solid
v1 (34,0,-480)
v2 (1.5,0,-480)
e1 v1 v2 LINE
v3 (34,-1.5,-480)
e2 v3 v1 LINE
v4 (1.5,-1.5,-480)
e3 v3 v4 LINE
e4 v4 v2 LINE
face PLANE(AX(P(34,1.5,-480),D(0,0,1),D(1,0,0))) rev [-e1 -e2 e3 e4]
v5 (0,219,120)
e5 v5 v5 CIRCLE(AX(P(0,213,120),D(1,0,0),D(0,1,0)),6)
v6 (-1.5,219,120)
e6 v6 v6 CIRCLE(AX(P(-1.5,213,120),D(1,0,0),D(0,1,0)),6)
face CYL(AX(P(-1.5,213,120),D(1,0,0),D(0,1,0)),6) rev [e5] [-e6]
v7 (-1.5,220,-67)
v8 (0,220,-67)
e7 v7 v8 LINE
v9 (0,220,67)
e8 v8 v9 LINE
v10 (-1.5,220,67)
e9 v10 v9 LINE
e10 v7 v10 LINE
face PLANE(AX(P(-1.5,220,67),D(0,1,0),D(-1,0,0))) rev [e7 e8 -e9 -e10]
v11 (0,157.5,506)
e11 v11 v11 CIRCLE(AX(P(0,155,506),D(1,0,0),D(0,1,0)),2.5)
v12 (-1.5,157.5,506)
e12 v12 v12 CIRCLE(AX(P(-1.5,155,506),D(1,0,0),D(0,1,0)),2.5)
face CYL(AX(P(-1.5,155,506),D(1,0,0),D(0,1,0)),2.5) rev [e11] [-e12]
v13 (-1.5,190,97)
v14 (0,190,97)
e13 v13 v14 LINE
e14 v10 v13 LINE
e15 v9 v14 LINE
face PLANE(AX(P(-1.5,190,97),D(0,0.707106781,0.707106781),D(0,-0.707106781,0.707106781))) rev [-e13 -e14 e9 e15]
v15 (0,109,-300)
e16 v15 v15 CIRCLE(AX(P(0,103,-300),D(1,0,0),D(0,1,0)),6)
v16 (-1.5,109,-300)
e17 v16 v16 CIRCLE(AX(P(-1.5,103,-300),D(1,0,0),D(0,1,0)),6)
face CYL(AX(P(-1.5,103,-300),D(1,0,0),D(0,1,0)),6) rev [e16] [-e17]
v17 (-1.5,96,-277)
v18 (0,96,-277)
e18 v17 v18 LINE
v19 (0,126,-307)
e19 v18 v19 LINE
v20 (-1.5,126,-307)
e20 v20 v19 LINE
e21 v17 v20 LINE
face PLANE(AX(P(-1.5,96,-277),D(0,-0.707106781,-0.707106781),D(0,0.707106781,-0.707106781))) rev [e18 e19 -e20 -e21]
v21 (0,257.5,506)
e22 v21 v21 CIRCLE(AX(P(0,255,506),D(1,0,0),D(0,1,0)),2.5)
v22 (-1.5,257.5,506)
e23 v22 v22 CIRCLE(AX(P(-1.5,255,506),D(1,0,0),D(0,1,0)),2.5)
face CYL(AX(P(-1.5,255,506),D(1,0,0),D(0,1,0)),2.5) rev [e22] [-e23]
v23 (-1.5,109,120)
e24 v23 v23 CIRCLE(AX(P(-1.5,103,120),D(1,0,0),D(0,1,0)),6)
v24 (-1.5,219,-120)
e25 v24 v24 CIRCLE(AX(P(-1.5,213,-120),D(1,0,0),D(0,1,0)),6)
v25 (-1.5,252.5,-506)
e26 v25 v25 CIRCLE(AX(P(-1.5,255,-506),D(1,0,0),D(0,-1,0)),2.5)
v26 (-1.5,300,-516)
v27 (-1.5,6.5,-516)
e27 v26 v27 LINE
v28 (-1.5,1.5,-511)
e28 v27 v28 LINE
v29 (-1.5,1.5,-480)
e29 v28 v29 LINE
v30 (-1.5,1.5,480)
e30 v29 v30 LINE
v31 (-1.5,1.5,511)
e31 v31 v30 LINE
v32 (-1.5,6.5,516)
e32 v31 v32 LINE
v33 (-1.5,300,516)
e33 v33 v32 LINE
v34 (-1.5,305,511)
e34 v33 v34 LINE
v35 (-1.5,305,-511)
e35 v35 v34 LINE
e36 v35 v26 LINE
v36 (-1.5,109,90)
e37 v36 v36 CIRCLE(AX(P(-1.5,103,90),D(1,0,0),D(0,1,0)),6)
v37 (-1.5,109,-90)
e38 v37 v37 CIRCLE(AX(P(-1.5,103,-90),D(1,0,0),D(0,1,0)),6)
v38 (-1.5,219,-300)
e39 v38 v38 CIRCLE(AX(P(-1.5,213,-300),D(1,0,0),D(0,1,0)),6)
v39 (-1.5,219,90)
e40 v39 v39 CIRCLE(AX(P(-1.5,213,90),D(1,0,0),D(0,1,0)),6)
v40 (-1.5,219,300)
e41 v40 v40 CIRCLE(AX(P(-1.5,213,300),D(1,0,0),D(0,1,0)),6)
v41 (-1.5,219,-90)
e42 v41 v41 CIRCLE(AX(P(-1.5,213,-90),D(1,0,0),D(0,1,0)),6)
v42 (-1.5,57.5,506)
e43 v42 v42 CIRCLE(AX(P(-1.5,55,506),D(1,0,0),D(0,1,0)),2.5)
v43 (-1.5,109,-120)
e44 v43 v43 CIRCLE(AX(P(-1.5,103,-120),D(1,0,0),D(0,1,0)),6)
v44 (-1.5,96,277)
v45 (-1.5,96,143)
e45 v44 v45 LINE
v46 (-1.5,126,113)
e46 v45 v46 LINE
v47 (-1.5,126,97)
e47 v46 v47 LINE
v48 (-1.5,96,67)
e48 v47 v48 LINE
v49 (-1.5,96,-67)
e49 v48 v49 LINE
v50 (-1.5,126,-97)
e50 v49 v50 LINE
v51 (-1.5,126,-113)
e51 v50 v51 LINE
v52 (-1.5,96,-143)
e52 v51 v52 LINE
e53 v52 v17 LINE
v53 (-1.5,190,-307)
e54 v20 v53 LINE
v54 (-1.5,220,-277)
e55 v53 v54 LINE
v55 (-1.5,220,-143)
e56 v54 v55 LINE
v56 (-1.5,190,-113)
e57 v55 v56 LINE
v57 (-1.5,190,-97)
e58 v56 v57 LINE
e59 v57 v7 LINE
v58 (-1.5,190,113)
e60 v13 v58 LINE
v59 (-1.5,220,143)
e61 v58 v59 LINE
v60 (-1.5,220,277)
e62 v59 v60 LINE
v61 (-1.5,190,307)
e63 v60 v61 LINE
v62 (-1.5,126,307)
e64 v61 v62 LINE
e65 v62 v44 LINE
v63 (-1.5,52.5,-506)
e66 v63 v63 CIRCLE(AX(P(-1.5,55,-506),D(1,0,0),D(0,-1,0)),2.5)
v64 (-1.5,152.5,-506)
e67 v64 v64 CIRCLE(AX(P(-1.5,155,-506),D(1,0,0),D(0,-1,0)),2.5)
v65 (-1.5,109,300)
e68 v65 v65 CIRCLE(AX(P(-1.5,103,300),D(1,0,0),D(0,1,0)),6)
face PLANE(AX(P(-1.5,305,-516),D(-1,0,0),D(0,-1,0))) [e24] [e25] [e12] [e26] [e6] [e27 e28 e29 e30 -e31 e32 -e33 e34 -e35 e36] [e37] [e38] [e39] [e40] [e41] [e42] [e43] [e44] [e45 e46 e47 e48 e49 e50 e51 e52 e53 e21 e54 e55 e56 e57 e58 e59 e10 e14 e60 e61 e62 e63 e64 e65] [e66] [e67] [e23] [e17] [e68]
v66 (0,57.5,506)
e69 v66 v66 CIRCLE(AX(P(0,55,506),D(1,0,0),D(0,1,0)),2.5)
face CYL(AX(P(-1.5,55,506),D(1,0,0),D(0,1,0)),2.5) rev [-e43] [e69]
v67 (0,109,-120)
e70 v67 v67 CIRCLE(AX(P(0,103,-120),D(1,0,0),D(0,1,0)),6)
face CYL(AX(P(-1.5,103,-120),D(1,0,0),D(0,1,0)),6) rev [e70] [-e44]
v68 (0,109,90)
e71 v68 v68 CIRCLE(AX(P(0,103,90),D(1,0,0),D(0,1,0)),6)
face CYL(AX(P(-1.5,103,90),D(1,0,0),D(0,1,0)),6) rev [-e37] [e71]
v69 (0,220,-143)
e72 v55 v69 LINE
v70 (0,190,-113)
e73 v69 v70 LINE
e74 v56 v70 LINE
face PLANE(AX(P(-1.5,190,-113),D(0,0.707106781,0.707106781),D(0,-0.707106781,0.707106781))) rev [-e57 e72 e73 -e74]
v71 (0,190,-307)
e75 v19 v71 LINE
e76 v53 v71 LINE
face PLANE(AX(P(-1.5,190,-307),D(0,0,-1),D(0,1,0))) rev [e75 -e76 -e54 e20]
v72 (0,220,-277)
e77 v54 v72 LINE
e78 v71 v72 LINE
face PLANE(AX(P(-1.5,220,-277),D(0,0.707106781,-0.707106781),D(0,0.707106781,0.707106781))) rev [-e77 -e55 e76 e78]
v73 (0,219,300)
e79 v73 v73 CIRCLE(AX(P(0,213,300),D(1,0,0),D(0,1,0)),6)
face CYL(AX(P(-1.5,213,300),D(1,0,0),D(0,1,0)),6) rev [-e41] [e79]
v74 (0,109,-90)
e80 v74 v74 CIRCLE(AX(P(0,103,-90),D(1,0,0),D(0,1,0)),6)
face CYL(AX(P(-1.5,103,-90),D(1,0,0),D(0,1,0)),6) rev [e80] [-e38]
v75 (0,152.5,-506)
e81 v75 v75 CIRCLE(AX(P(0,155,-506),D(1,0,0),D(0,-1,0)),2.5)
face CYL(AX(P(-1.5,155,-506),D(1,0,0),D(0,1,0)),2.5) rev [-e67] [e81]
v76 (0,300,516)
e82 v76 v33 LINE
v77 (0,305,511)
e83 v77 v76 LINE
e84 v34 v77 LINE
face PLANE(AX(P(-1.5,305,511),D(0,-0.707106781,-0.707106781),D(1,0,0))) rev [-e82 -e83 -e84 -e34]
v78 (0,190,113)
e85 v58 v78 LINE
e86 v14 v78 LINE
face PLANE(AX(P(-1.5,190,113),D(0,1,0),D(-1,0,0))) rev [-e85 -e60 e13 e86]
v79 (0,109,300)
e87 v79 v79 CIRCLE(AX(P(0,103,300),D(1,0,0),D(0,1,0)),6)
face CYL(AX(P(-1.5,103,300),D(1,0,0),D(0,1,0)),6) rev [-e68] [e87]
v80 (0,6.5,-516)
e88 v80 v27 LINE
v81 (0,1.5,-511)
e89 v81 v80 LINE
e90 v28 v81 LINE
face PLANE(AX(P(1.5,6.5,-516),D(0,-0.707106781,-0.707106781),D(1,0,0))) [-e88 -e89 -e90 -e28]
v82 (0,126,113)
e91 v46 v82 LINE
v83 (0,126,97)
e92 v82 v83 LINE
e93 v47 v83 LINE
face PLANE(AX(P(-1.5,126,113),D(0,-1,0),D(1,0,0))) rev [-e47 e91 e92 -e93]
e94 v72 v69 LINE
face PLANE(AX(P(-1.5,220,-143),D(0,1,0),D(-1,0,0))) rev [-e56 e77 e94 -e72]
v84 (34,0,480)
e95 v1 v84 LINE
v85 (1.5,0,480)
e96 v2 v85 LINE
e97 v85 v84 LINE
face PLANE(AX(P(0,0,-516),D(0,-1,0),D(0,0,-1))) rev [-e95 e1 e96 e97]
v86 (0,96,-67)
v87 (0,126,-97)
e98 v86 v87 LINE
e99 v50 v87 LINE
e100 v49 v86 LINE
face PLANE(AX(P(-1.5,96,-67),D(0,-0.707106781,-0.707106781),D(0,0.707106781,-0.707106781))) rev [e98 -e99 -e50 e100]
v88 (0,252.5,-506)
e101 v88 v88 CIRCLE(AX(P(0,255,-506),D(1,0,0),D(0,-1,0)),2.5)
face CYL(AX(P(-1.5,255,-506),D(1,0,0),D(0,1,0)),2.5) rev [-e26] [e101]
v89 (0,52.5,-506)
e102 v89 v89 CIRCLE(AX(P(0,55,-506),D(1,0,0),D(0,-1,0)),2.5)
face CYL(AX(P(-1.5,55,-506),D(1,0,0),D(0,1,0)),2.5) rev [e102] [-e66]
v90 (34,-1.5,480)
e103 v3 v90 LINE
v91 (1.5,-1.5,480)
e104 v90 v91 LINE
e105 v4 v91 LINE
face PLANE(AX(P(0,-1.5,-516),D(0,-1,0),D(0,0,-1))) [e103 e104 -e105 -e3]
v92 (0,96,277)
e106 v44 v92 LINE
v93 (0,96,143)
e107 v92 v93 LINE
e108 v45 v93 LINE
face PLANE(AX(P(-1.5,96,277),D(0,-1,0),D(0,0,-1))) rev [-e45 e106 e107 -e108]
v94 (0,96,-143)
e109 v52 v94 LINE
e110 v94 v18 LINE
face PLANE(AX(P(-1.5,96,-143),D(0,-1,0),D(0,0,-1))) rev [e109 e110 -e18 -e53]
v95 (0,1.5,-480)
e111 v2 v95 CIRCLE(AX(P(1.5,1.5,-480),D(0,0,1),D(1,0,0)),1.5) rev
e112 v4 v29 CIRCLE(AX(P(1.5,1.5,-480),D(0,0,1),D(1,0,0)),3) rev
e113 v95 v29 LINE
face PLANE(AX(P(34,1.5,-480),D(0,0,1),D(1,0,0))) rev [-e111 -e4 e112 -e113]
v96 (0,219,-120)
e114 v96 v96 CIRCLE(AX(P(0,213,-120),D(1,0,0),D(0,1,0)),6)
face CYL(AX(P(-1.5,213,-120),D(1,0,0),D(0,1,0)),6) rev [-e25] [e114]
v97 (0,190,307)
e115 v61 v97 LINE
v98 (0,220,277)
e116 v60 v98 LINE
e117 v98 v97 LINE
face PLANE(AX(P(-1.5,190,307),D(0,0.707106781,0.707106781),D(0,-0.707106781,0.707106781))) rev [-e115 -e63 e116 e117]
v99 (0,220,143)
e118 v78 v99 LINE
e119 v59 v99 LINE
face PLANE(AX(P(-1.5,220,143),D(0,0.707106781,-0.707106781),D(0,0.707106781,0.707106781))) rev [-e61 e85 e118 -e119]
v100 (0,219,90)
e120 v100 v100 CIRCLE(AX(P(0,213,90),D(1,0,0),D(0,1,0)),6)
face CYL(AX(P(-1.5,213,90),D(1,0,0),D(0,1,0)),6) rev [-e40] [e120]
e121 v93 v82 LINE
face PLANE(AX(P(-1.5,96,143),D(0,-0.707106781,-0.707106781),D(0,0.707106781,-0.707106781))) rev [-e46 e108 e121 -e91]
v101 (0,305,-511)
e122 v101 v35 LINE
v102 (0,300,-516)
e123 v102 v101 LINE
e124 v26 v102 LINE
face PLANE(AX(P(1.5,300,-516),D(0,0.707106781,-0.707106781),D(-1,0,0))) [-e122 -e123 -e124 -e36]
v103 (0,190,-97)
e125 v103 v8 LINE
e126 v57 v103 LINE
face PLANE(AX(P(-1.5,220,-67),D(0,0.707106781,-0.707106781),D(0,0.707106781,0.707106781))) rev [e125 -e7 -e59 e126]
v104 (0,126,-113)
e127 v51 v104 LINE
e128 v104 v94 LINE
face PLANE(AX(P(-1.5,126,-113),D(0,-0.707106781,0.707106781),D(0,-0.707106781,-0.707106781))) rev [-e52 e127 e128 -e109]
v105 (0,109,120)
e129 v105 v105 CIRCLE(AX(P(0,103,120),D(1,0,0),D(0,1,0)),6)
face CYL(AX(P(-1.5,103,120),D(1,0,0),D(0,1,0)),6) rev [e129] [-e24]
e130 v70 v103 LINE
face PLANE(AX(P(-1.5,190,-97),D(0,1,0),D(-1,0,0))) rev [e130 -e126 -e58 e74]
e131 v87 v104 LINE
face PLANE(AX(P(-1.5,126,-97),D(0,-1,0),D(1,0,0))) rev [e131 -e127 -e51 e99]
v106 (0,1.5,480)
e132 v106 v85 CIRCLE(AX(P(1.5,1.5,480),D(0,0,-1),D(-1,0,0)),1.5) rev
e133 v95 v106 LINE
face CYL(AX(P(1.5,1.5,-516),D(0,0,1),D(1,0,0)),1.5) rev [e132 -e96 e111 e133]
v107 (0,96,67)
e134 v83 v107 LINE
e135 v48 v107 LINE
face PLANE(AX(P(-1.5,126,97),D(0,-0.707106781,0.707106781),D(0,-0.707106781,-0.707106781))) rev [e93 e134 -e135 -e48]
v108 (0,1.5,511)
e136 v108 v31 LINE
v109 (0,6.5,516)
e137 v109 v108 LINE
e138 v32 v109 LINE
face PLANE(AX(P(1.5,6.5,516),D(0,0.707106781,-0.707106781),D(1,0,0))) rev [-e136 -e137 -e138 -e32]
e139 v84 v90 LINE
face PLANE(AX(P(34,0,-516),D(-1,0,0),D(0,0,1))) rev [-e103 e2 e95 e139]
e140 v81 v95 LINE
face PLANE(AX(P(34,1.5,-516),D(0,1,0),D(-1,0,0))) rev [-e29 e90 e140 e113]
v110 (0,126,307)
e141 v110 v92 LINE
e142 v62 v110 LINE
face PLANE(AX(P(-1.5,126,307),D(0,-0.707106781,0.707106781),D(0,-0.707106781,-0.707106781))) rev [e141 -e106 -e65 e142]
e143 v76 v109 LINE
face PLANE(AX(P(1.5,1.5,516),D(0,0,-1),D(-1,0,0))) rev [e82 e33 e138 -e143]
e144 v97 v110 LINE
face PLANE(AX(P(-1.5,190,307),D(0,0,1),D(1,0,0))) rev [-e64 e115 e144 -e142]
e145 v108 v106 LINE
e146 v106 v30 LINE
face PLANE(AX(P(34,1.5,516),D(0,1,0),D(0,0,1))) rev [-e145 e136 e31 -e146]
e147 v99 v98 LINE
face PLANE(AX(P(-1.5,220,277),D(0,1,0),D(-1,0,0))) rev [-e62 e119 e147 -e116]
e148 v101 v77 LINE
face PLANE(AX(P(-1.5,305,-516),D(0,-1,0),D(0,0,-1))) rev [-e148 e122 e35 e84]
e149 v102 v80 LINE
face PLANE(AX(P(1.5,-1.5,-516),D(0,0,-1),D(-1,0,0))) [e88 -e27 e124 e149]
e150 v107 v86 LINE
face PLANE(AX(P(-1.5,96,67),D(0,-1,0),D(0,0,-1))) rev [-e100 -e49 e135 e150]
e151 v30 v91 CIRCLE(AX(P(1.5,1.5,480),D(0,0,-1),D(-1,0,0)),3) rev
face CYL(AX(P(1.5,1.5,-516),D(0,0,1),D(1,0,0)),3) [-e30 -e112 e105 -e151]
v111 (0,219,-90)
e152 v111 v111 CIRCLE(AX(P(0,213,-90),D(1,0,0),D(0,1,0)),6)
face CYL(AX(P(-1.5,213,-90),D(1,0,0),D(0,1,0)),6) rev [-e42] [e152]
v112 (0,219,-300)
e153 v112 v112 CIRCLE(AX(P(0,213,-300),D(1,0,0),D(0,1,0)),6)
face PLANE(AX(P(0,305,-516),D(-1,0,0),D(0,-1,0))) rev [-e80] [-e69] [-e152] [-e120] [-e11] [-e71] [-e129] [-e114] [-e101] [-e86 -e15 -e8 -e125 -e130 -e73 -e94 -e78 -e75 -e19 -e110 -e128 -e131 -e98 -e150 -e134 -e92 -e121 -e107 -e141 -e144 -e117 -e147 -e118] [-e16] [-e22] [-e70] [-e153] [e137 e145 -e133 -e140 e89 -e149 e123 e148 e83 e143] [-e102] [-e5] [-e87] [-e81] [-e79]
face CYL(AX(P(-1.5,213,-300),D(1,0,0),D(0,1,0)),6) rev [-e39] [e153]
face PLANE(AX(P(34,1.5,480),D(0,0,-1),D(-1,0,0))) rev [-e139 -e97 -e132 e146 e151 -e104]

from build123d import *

# Parameters (mm, degrees)
SM_BASE_FLANGE_1_DEPTH = 516
SKETCH_7_W             = 36
SKETCH_7_H             = 3
CUT_EXTRUDE_1_DEPTH    = 601.450872262
OTHER_START            = -1.5
OTHER_1_DEPTH          = 1.5
SKETCH_8_R             = 6
CUT_EXTRUDE_1446_DEPTH = 10
PATTERN_LINEAR_1_COUNT = 3
PATTERN_LINEAR_1_PITCH = 210
SKETCH_9_R             = 2.5
CUT_EXTRUDE_3_DEPTH    = 10
SKETCH_10_W            = 16
SKETCH_10_H            = 64
CUT_EXTRUDE_4_DEPTH    = 10


# Read off the part's stored shape, not the designer's step: Затупленный угол1
# Sheet-metal steps are written as plain solids
with BuildPart() as part:
    # Sketch 1 → Базовая кромка1 (new, symmetric)
    with BuildSketch(Plane.XY):
        with BuildLine():
            Line((0, 305), (0, 1.5))
            ThreePointArc((0, 1.5), (0.439339828, 0.439339828), (1.5, 0))
            Line((1.5, 0), (34, 0))
            Line((34, 0), (34, -1.5))
            Line((34, -1.5), (1.5, -1.5))
            ThreePointArc((1.5, -1.5), (-0.621320344, -0.621320344), (-1.5, 1.5))
            Line((-1.5, 1.5), (-1.5, 305))
            Line((-1.5, 305), (0, 305))
        make_face()
    extrude(amount=SM_BASE_FLANGE_1_DEPTH, both=True)

    # Эскиз7 → Вырез-Вытянуть1 (cut, through all)
    with BuildSketch(Plane.ZY.offset(1.5)):
        with Locations((-498, 0)):
            Rectangle(SKETCH_7_W, SKETCH_7_H)
        with Locations((498, 0)):
            Rectangle(SKETCH_7_W, SKETCH_7_H)
    extrude(amount=-CUT_EXTRUDE_1_DEPTH, mode=Mode.SUBTRACT)

    # Other 1 outline → Other 1 (cut)
    with BuildSketch(Plane.YZ.offset(OTHER_START)):
        Polygon((1.5, 516), (1.5, 511), (6.5, 516), align=None)
        Polygon((1.5, -516), (6.5, -516), (1.5, -511), align=None)
        Polygon((305, -516), (305, -511), (300, -516), align=None)
        Polygon((305, 516), (300, 516), (305, 511), align=None)
    extrude(amount=OTHER_1_DEPTH, mode=Mode.SUBTRACT)

    # Эскиз8 → Cut-Extrude 1446 (cut)
    with BuildSketch(Plane(origin=(0, 0, 0), x_dir=(0, 0, -1), z_dir=(1, 0, 0))):
        with Locations(Location((-300, 213, 0), (0, 0, 90))):
            Circle(SKETCH_8_R)
        with Locations(Location((-300, 103, 0), (0, 0, 90))):
            Circle(SKETCH_8_R)
        with Locations(Location((-120, 103, 0), (0, 0, 90))):
            Circle(SKETCH_8_R)
        with Locations(Location((-120, 213, 0), (0, 0, 90))):
            Circle(SKETCH_8_R)
        Polygon((-307, 126), (-277, 96), (-143, 96), (-113, 126), (-113, 190), (-143, 220), (-277, 220), (-307, 190), align=None)
    cut_extrude_1446 = extrude(amount=-CUT_EXTRUDE_1446_DEPTH, mode=Mode.SUBTRACT)

    # Линейный массив1: Cut-Extrude 1446 ×3
    with Locations(*[(0, 0, -i * PATTERN_LINEAR_1_PITCH) for i in range(1, PATTERN_LINEAR_1_COUNT)]):
        add(cut_extrude_1446, mode=Mode.SUBTRACT)

    # Эскиз9 → Вырез-Вытянуть3 (cut)
    with BuildSketch(Plane(origin=(0, 0, 0), x_dir=(0, 0, -1), z_dir=(1, 0, 0))):
        with Locations(Location((-506, 255, 0), (0, 0, 90))):
            Circle(SKETCH_9_R)
        with Locations(Location((-506, 155, 0), (0, 0, 90))):
            Circle(SKETCH_9_R)
        with Locations(Location((-506, 55, 0), (0, 0, 90))):
            Circle(SKETCH_9_R)
        with Locations(Location((506, 55, 0), (0, 0, 270))):
            Circle(SKETCH_9_R)
        with Locations(Location((506, 155, 0), (0, 0, 270))):
            Circle(SKETCH_9_R)
        with Locations(Location((506, 255, 0), (0, 0, 270))):
            Circle(SKETCH_9_R)
    extrude(amount=-CUT_EXTRUDE_3_DEPTH, mode=Mode.SUBTRACT)

    # Эскиз10 → Вырез-Вытянуть4 (cut)
    with BuildSketch(Plane(origin=(0, 0, 0), x_dir=(0, 0, -1), z_dir=(1, 0, 0))):
        with Locations((-105, 158)):
            Rectangle(SKETCH_10_W, SKETCH_10_H)
        with Locations((105, 158)):
            Rectangle(SKETCH_10_W, SKETCH_10_H)
    extrude(amount=-CUT_EXTRUDE_4_DEPTH, mode=Mode.SUBTRACT)


solid = part.part
